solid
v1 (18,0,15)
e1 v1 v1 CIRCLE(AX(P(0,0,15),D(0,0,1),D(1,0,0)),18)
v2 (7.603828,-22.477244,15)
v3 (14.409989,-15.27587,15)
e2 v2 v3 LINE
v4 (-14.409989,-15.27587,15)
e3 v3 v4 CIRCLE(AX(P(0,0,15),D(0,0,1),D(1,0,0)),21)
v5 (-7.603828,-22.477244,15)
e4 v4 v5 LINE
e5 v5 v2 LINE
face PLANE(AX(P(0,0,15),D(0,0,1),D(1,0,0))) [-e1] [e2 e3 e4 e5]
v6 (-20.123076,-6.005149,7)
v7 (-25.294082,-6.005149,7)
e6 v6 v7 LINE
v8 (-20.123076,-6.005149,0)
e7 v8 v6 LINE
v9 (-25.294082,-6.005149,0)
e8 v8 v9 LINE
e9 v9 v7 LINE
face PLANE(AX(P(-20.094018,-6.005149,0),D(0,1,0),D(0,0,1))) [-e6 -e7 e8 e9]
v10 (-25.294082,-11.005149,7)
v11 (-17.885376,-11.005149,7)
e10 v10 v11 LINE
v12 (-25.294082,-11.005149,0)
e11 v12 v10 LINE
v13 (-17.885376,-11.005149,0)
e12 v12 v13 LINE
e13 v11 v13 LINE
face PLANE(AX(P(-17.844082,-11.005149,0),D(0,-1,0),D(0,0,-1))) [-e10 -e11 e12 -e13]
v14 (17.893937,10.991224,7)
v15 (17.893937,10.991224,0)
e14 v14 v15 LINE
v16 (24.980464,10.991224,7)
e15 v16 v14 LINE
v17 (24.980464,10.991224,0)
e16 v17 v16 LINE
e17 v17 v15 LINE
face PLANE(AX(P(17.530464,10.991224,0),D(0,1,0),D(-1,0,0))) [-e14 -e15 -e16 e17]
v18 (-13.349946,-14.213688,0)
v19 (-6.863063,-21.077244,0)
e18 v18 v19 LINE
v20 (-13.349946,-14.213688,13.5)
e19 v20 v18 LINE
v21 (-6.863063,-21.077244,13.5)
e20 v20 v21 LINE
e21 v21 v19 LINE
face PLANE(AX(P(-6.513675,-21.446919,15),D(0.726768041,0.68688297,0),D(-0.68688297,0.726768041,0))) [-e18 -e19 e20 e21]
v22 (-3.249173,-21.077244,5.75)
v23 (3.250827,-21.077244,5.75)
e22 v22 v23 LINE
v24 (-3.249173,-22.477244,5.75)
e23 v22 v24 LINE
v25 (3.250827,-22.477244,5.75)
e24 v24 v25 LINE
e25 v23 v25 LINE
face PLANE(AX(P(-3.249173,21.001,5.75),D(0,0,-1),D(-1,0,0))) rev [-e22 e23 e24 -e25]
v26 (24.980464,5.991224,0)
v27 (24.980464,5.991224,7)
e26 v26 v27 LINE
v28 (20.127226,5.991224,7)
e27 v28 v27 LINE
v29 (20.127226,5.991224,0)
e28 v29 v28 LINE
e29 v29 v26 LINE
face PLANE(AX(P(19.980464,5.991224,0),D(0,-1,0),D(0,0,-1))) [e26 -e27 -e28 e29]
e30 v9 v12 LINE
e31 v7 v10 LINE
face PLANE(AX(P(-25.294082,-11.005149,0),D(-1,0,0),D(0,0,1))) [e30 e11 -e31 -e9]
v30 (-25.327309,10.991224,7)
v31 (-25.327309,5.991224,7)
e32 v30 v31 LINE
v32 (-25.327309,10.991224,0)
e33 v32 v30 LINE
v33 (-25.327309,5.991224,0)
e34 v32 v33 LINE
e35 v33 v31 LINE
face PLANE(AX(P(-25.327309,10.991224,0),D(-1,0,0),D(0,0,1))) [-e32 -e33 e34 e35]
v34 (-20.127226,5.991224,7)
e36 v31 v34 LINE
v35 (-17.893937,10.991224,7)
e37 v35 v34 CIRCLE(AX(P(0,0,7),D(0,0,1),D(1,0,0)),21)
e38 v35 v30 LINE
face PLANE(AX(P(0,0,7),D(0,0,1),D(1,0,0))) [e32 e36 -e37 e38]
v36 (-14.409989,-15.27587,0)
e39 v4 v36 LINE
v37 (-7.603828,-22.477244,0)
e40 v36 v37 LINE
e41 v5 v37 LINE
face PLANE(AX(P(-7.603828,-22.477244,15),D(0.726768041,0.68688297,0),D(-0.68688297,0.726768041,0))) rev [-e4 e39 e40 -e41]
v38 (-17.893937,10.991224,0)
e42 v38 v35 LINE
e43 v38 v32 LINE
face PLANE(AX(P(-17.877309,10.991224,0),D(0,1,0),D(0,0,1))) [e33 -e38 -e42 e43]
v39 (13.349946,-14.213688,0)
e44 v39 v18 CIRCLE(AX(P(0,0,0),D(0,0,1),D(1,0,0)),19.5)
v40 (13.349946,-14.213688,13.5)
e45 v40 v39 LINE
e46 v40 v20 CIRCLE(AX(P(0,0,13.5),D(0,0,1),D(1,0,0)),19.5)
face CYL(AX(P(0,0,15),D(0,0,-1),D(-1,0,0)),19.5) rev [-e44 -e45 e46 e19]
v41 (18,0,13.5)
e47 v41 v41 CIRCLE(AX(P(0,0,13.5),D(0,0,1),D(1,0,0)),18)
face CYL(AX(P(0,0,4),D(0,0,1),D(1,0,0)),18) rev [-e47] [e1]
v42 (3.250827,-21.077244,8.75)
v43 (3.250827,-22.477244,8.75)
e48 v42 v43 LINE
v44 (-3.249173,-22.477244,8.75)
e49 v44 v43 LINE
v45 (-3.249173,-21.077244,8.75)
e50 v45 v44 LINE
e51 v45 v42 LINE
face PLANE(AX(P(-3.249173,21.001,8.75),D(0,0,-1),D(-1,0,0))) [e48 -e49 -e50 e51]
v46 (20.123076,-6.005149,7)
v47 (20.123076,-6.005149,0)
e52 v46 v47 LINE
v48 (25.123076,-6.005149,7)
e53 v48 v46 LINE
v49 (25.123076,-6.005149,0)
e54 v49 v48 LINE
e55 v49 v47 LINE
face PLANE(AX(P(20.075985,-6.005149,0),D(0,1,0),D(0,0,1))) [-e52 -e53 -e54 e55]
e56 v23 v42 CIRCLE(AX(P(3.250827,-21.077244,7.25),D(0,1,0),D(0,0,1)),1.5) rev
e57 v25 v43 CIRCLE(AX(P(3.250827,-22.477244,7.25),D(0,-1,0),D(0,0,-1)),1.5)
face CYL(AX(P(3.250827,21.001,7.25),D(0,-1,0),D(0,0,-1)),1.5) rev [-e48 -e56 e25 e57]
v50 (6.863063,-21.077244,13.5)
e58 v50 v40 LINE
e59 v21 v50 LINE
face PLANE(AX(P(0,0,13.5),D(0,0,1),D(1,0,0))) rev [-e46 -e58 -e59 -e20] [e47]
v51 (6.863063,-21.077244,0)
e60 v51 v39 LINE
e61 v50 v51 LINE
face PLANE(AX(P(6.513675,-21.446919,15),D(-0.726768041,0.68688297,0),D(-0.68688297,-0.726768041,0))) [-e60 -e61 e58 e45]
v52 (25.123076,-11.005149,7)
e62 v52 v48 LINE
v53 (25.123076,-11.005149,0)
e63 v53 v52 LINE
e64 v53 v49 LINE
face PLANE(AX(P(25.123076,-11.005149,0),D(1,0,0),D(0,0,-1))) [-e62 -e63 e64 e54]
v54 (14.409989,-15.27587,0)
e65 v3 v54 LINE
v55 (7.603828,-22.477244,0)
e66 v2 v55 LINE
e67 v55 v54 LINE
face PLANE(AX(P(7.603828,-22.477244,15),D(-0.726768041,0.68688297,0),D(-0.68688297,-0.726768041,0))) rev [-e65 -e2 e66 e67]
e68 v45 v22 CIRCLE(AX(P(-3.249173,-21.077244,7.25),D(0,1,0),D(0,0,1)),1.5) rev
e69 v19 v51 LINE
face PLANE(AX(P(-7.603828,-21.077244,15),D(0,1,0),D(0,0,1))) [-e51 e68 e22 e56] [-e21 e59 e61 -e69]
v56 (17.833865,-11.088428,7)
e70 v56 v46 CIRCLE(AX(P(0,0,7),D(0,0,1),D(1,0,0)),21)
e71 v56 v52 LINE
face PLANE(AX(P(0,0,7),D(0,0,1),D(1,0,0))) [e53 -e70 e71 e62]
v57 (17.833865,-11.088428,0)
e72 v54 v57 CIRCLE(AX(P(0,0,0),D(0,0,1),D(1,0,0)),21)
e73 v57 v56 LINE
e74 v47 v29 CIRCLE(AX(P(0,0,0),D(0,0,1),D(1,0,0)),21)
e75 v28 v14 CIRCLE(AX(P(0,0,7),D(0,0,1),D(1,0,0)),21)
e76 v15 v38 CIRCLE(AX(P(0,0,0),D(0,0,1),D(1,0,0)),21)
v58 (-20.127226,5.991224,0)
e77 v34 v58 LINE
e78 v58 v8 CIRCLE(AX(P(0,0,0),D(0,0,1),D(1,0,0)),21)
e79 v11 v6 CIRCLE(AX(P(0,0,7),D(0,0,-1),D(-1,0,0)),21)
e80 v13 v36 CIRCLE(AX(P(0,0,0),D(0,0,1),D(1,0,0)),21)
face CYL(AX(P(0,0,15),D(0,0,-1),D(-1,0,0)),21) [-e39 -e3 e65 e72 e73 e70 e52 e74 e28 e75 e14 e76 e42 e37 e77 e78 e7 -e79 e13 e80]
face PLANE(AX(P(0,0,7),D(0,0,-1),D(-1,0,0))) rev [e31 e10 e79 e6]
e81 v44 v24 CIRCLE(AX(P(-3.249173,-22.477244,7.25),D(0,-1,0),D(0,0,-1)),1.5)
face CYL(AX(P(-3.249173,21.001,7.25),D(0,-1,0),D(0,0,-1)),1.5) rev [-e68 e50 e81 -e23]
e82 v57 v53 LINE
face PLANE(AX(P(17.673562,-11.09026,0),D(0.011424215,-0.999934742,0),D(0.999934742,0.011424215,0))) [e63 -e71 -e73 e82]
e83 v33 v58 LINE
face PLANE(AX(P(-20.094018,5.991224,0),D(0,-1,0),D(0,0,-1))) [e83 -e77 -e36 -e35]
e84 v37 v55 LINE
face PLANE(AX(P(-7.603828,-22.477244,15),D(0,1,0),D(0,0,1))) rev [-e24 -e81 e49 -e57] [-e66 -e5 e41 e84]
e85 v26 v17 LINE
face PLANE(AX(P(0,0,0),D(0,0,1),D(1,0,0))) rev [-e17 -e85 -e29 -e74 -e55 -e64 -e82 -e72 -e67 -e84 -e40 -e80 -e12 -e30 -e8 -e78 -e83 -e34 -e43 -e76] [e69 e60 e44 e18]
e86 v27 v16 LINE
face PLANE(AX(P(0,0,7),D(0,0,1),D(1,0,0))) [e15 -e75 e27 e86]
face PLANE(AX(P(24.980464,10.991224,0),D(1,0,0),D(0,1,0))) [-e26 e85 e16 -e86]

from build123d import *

# Parameters (mm, degrees)
BOSS_EXTRUDE1_DEPTH = 15
SHELL3_DEPTH        = 13.5
SKETCH5_R           = 18
CUT_EXTRUDE4_DEPTH  = 11
BOSS_EXTRUDE2_START = -8
BOSS_EXTRUDE2_DEPTH = 7
CUT_EXTRUDE5_REACH  = 54.505


# Read off the part's stored shape, not the designer's step: Shell3
with BuildPart() as part:
    # Sketch1 → Boss-Extrude1 (new body)
    with BuildSketch(Plane.XY):
        with BuildLine():
            Line((-7.603827524, -22.477243695), (7.603827524, -22.477243695))
            Line((7.603827524, -22.477243695), (14.409989224, -15.275870207))
            ThreePointArc((14.409989224, -15.275870207), (0, 21), (-14.409989224, -15.275870207))
            Line((-14.409989224, -15.275870207), (-7.603827524, -22.477243695))
        make_face()
    extrude(amount=BOSS_EXTRUDE1_DEPTH)

    # Shell3 outline → Shell3 (cut)
    with BuildSketch(Plane.XY):
        with BuildLine():
            Line((6.863063192, -21.077243695), (13.349946464, -14.213688101))
            ThreePointArc((13.349946464, -14.213688101), (0, 19.5), (-13.349946464, -14.213688101))
            Line((-13.349946464, -14.213688101), (-6.863063192, -21.077243695))
            Line((-6.863063192, -21.077243695), (6.863063192, -21.077243695))
        make_face()
    extrude(amount=SHELL3_DEPTH, mode=Mode.SUBTRACT)

    # Sketch5 → Cut-Extrude4 (cut)
    with BuildSketch(Plane.XY.offset(15)):
        Circle(SKETCH5_R)
    extrude(amount=-CUT_EXTRUDE4_DEPTH, mode=Mode.SUBTRACT)

    # Sketch6 → Boss-Extrude2 (add)
    with BuildSketch(Plane.XY.offset(15).offset(BOSS_EXTRUDE2_START)):
        Polygon((17.530464007, 10.991223826), (24.980464007, 10.991223826), (24.980464007, 5.991223826), (19.980464007, 5.991223826), align=None)
        Polygon((17.673562003, -11.090259794), (20.075985217, -6.005149393), (25.123075828, -6.005149393), (25.123075828, -11.005149393), align=None)
        Polygon((-17.877308509, 10.991223826), (-20.094018297, 5.991223826), (-25.327308509, 5.991223826), (-25.327308509, 10.991223826), align=None)
        Polygon((-25.294081514, -11.005149393), (-25.294081514, -6.005149393), (-20.094018297, -6.005149393), (-17.844081514, -11.005149393), align=None)
    extrude(amount=-BOSS_EXTRUDE2_DEPTH)

    # Sketch21 → Cut-Extrude5 (cut, up to next)
    with BuildSketch(Plane.XZ.offset(22.477243695), mode=Mode.PRIVATE) as cut_extrude5_sk1:
        with BuildLine():
            Line((-3.249172698, 8.75), (3.250827302, 8.75))
            ThreePointArc((3.250827302, 8.75), (4.750827302, 7.25), (3.250827302, 5.75))
            Line((3.250827302, 5.75), (-3.249172698, 5.75))
            ThreePointArc((-3.249172698, 5.75), (-4.749172698, 7.25), (-3.249172698, 8.75))
        make_face()
    cut_extrude5_tool1 = extrude(cut_extrude5_sk1.sketch, amount=-CUT_EXTRUDE5_REACH, mode=Mode.PRIVATE) & part.part
    add(cut_extrude5_tool1.solids().sort_by_distance((0.000827, -22.477244, 7.25))[0], mode=Mode.SUBTRACT)


solid = part.part
